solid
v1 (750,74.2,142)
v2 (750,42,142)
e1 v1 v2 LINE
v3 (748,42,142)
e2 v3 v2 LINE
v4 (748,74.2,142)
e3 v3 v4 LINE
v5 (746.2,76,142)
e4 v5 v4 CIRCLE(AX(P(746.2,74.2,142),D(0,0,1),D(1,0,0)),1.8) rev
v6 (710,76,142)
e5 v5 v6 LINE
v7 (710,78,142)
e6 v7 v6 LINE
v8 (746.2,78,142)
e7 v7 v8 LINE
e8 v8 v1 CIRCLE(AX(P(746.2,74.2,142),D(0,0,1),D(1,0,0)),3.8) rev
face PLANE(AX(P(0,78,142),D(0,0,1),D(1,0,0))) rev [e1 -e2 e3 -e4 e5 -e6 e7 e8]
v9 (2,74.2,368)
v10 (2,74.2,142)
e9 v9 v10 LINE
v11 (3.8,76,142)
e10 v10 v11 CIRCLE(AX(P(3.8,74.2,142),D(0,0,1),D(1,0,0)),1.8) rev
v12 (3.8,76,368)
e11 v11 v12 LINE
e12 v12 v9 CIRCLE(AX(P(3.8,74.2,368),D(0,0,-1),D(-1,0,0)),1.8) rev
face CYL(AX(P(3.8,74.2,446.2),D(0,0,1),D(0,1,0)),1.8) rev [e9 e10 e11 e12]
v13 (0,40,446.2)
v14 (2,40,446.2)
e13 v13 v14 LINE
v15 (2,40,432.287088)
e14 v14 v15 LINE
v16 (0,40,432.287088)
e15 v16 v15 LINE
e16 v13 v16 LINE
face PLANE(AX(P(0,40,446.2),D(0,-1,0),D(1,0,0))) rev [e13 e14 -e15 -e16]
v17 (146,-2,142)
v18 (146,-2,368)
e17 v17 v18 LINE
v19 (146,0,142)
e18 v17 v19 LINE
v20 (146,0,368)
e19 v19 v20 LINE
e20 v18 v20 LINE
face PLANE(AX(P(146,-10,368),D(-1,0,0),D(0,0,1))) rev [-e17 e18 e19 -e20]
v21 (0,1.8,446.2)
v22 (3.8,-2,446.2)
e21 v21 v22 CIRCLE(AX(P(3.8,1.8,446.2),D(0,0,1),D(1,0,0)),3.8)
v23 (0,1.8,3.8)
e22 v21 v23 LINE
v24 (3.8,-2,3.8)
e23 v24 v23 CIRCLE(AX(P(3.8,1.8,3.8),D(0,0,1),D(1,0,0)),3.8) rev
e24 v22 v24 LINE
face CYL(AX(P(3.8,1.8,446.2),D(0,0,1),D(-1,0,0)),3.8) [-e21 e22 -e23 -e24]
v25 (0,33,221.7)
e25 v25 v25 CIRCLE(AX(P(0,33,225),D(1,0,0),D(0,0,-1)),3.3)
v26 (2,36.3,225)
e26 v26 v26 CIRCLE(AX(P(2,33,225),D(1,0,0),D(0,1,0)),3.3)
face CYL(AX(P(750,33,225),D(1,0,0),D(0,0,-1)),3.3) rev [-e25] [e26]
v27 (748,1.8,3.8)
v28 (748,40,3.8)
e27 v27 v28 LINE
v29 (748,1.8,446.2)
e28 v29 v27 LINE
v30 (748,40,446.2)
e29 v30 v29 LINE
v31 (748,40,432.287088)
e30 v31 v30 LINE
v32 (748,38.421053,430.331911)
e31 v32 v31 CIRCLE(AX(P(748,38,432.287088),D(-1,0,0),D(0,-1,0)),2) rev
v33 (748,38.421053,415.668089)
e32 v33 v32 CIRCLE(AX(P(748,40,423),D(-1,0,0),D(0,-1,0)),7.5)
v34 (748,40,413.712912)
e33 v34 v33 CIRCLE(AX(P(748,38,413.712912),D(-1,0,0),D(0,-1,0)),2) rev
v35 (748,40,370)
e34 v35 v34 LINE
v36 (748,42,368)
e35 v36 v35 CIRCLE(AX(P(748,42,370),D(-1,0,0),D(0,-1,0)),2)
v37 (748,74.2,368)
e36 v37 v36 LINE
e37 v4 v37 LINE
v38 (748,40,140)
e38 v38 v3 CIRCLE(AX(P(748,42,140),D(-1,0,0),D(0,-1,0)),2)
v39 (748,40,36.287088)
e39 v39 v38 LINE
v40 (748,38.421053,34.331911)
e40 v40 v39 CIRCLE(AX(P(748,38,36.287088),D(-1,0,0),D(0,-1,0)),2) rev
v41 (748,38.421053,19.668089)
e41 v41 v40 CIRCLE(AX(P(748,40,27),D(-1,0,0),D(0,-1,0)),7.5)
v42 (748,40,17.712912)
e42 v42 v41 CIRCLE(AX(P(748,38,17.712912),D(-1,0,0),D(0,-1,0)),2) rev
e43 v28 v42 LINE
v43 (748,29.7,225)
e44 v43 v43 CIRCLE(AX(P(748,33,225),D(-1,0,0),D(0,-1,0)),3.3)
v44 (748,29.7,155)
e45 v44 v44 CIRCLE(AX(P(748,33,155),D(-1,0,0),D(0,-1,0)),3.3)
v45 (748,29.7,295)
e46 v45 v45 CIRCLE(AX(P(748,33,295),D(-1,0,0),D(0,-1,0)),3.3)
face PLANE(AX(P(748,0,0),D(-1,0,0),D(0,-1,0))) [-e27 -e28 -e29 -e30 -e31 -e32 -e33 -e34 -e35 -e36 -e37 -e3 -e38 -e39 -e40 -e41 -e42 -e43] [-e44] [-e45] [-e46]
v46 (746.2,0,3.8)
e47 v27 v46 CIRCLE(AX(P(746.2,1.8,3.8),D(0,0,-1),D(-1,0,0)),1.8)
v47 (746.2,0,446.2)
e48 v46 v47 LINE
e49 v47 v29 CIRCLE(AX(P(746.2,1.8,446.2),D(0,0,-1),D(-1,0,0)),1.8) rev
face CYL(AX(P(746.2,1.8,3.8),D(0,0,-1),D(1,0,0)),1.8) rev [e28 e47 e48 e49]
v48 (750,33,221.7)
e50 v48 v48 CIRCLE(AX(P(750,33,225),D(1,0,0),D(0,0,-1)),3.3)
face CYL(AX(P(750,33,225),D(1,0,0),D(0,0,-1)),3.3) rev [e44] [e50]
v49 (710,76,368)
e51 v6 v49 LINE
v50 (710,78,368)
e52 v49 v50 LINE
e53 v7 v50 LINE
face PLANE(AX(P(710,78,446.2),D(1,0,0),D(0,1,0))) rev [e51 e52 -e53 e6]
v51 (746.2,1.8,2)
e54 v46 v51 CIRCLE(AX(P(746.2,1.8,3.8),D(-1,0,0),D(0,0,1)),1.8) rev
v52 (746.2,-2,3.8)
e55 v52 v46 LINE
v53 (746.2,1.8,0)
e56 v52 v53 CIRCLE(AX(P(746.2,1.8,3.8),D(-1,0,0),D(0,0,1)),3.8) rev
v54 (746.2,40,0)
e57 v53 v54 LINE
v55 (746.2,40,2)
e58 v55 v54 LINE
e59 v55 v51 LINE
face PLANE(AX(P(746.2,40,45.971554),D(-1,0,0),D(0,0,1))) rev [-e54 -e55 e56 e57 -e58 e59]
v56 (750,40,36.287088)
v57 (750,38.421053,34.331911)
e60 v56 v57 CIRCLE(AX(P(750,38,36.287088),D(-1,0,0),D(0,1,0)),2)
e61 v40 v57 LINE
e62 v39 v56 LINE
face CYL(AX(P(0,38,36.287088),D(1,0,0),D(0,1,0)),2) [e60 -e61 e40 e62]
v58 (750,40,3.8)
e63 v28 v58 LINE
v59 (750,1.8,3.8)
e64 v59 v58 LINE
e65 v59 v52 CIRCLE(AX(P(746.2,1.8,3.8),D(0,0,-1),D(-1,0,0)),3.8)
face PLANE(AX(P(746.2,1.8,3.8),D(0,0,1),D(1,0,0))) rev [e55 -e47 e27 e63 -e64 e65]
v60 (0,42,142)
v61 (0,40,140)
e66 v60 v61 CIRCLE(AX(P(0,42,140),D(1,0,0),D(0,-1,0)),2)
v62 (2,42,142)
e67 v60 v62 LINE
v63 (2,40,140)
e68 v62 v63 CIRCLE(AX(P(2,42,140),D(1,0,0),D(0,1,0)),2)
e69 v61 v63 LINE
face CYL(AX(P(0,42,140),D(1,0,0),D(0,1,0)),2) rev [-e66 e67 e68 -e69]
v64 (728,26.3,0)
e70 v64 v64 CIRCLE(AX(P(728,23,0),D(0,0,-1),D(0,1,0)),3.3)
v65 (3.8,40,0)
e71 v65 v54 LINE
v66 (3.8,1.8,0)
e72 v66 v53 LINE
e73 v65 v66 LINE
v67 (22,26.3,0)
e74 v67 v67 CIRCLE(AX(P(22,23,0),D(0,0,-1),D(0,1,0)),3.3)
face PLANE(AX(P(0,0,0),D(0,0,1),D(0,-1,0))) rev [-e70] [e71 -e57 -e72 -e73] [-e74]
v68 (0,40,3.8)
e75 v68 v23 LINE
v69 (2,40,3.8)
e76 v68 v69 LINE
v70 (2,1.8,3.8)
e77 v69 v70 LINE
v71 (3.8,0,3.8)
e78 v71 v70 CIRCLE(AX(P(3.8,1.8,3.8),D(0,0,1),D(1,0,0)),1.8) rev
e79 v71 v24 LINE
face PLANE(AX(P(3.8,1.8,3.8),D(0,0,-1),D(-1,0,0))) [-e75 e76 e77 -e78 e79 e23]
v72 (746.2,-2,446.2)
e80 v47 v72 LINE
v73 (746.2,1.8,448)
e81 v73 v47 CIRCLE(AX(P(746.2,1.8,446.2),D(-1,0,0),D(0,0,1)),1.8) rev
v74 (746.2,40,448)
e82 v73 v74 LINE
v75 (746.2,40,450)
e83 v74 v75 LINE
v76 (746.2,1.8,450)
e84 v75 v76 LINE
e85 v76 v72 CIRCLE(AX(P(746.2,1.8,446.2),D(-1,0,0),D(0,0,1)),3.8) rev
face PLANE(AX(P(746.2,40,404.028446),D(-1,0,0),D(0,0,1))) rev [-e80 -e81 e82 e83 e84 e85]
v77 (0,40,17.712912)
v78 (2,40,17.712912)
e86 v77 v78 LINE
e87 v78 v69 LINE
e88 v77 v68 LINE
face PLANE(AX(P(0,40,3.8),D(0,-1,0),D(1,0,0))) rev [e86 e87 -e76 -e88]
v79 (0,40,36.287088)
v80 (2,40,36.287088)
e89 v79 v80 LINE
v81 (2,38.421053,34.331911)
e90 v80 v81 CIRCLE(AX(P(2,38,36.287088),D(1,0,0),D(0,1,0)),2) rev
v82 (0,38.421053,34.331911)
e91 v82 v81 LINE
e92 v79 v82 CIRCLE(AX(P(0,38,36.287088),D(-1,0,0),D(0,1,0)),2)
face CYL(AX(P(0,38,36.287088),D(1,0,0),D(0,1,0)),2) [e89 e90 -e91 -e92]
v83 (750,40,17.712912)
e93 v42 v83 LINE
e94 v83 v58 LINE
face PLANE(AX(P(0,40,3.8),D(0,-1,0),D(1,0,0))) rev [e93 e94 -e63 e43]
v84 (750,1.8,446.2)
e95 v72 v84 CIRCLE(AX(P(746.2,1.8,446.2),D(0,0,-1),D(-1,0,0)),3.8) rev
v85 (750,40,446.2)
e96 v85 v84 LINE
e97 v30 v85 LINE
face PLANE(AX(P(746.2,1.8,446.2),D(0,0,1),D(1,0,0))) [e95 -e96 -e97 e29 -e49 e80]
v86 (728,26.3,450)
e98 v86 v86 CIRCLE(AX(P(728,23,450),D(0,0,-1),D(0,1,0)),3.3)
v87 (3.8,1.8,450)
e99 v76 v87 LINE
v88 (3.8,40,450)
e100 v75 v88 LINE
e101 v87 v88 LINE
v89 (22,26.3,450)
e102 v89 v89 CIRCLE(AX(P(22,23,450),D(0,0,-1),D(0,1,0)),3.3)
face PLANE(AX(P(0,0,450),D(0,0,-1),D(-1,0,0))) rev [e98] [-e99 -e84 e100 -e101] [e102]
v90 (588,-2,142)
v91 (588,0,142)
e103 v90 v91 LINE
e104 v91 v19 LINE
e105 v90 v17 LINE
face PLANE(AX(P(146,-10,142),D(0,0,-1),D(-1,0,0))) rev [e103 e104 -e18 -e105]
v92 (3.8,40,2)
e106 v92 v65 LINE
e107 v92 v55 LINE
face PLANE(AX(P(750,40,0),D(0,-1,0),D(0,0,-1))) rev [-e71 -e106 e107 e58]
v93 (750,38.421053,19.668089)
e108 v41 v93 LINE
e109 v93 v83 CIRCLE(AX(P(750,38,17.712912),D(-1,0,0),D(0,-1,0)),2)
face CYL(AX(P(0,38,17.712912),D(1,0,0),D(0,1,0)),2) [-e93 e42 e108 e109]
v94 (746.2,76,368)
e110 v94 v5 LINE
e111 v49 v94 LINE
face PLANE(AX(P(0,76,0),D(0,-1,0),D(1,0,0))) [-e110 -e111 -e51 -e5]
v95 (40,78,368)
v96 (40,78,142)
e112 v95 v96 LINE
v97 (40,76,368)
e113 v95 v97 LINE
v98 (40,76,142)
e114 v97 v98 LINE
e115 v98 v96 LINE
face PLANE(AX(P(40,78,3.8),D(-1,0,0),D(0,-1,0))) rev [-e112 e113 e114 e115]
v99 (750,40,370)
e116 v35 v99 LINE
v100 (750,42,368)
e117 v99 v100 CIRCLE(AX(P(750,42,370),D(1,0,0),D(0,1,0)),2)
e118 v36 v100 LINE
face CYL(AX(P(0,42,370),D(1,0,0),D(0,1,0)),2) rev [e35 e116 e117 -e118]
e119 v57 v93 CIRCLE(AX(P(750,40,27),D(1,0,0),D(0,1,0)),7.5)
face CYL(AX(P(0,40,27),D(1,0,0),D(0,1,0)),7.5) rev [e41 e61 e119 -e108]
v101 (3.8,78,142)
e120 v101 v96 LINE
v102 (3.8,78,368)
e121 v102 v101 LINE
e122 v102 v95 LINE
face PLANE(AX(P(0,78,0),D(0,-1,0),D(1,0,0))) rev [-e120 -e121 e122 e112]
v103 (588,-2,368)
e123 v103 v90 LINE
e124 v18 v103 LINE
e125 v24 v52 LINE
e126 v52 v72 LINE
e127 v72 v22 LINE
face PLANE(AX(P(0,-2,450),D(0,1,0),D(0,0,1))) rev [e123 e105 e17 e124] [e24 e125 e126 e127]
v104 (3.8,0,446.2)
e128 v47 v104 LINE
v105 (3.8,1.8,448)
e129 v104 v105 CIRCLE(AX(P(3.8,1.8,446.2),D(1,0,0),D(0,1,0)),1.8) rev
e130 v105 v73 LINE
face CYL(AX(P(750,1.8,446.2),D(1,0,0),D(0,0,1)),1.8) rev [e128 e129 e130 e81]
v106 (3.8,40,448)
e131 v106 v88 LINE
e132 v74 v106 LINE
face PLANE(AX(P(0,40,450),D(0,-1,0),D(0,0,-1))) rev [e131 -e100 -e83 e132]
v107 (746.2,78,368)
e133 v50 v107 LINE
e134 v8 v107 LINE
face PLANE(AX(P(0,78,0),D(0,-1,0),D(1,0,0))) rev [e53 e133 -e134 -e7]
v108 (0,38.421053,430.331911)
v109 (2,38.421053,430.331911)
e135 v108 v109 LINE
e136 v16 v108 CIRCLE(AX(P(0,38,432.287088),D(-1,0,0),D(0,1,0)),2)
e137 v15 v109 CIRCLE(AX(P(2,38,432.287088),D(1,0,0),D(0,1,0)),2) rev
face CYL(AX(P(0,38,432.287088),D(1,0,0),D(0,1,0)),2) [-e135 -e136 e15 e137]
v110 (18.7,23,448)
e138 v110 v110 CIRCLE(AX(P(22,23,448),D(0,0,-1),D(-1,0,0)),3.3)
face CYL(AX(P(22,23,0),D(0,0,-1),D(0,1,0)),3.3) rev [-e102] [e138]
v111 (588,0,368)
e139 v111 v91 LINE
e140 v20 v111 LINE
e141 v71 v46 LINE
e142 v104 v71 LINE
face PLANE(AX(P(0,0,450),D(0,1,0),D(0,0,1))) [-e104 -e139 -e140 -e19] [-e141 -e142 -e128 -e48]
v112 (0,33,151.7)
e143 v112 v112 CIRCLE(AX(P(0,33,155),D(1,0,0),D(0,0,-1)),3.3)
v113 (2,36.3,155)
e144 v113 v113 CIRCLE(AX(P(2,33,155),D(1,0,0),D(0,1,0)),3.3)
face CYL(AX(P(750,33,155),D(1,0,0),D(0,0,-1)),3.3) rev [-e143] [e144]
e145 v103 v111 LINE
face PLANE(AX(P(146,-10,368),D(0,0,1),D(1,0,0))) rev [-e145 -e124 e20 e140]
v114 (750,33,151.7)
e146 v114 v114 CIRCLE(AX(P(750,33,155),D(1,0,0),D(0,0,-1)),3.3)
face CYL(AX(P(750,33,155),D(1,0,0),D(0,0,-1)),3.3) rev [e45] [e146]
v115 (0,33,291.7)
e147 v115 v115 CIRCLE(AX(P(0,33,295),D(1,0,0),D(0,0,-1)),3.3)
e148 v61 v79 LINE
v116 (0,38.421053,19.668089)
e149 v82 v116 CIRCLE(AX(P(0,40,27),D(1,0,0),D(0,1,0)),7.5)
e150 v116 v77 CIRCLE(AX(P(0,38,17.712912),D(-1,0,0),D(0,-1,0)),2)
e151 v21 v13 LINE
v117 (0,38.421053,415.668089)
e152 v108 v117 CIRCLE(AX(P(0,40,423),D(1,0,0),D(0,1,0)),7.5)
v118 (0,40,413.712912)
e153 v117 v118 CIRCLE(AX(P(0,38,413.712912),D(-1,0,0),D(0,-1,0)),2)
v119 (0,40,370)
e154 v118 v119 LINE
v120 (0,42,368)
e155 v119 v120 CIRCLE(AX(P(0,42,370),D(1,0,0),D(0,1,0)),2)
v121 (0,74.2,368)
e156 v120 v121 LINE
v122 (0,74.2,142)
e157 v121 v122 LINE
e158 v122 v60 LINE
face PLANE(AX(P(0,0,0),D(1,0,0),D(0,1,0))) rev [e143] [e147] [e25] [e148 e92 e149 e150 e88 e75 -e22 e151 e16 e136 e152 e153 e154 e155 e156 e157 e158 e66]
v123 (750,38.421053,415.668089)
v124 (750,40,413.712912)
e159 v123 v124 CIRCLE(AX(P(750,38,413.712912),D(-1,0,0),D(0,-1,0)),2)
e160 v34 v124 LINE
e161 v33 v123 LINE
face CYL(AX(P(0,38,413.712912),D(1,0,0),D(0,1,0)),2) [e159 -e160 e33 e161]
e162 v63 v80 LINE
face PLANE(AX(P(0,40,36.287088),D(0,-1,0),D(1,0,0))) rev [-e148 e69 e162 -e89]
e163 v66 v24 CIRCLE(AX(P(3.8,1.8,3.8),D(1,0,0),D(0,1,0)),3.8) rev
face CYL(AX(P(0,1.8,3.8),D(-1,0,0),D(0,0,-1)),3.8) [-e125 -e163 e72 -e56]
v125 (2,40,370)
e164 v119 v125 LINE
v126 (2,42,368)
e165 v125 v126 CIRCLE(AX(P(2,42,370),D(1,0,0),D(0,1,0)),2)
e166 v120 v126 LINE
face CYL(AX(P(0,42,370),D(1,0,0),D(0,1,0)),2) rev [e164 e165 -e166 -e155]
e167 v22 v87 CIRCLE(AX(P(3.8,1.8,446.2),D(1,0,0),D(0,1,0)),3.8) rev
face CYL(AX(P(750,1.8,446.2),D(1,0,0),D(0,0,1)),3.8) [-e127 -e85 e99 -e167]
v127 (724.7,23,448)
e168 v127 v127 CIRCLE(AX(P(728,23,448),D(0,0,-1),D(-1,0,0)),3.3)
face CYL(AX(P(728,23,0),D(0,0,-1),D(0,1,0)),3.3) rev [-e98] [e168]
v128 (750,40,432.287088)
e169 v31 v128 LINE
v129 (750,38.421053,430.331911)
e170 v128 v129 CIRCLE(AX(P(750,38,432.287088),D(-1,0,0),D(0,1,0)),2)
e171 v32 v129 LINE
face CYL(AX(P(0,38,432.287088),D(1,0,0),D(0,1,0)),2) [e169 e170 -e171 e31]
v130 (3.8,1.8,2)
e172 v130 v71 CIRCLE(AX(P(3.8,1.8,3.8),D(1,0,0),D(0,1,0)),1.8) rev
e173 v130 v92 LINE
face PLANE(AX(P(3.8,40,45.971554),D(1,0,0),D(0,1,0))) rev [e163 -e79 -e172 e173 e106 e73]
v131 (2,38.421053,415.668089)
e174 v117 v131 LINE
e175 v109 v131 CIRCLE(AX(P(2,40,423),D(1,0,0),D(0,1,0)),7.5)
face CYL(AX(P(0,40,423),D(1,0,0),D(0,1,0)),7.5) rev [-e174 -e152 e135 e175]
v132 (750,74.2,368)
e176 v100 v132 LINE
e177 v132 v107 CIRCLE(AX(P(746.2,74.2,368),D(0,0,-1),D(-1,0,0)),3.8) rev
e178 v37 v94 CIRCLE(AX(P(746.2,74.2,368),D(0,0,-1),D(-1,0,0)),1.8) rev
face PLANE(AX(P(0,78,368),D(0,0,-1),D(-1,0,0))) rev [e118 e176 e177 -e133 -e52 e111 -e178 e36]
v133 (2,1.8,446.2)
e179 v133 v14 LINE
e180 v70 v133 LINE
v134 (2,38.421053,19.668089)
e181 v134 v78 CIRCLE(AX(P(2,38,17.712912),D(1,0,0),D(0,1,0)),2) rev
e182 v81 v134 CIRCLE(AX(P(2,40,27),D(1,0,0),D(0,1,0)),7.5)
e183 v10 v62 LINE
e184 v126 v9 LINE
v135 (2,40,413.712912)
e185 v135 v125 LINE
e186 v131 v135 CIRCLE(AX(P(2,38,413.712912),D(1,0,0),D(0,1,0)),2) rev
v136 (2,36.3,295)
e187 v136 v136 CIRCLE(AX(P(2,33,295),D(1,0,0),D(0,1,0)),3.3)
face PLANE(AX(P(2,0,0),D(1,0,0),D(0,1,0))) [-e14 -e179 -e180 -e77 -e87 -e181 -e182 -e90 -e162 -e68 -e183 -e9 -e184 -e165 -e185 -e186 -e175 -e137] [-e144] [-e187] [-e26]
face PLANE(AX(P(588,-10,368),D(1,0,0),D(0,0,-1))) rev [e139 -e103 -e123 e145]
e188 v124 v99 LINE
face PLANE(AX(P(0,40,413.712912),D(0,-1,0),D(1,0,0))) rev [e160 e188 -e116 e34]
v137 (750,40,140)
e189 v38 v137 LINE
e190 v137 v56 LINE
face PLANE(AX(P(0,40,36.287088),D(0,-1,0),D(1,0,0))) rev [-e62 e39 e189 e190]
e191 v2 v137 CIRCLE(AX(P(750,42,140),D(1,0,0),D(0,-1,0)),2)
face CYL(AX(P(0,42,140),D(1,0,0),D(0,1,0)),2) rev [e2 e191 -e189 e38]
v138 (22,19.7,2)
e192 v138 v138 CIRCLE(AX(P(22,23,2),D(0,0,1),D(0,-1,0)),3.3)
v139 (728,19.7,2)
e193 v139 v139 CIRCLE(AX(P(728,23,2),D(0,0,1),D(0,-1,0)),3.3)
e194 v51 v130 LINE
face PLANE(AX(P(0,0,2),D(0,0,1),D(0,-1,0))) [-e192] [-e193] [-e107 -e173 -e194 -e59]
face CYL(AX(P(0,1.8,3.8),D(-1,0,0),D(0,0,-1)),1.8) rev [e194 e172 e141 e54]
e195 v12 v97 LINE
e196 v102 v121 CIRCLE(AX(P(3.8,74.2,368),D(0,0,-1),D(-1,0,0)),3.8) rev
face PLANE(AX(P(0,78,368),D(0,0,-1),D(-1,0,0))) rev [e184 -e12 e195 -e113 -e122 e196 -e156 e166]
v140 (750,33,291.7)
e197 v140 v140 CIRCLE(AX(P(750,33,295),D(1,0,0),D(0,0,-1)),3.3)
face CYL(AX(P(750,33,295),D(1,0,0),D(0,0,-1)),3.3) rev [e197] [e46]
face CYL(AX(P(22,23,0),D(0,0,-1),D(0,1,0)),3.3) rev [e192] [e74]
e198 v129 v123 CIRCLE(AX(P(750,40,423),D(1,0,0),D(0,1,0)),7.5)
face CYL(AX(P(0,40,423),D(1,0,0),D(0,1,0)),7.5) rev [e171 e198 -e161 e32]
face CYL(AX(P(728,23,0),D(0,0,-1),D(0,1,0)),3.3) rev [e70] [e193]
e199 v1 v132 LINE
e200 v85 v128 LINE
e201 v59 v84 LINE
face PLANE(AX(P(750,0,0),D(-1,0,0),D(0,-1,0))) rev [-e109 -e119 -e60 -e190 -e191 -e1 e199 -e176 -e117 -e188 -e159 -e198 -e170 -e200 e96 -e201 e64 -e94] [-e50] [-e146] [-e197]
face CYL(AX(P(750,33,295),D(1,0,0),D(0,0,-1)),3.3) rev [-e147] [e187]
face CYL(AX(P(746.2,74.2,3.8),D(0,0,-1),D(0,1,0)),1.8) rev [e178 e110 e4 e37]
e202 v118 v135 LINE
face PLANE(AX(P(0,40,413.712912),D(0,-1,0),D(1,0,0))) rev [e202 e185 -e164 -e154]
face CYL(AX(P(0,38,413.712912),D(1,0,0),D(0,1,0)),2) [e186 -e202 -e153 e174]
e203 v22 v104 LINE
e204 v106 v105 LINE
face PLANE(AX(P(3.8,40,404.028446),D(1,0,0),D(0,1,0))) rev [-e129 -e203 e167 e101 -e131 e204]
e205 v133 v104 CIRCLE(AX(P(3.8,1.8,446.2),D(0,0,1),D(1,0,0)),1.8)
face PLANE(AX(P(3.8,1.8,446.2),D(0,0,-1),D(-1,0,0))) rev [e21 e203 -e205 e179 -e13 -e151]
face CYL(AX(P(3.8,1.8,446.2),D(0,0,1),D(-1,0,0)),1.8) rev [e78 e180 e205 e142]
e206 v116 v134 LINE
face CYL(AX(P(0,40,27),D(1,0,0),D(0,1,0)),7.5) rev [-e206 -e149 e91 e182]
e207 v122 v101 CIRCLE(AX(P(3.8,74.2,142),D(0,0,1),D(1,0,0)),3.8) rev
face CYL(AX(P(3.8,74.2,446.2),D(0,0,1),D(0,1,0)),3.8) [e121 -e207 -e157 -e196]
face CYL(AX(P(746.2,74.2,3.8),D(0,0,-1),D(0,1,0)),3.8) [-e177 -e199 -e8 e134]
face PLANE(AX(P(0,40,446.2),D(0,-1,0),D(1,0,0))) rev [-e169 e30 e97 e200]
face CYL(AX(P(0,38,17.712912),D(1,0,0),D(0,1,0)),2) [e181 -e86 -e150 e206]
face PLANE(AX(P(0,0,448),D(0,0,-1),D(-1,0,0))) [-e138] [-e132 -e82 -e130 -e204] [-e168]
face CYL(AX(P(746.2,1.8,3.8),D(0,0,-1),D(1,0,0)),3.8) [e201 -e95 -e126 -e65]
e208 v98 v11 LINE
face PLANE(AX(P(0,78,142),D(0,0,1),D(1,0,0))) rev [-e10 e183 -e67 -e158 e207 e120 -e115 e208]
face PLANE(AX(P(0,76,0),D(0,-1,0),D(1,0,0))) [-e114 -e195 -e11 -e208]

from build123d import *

# Parameters (mm, degrees)
SKETCH_1_W                         = 750
SKETCH_1_H                         = 2
SM_BASE_FLANGE_1_DEPTH             = 450
SM_EDGE_FLANGE_1_STRIP_W           = 11.6
SM_EDGE_FLANGE_1_STRIP_H           = 2
SM_EDGE_FLANGE_1_STRIP_CUT_DEPTH   = 750
SM_EDGE_FLANGE_1_STRIP_2_W         = 11.6
SM_EDGE_FLANGE_1_STRIP_2_H         = 2
SM_EDGE_FLANGE_1_STRIP_CUT_2_DEPTH = 750
SM_EDGE_FLANGE_1_DEPTH             = 750
SM_EDGE_FLANGE_1_BEND_DEPTH        = 750
SM_EDGE_FLANGE_2_STRIP_W           = 11.6
SM_EDGE_FLANGE_2_STRIP_H           = 2
SM_EDGE_FLANGE_2_STRIP_CUT_DEPTH   = 442.4
SM_EDGE_FLANGE_2_STRIP_2_W         = 11.6
SM_EDGE_FLANGE_2_STRIP_2_H         = 2
SM_EDGE_FLANGE_2_STRIP_CUT_2_DEPTH = 442.4
SM_EDGE_FLANGE_2_DEPTH             = 442.4
SM_EDGE_FLANGE_2_BEND_DEPTH        = 442.4
CUT_EXTRUDE_1_REACH                = 880.114
SKETCH_19_W                        = 3.8
SKETCH_19_H                        = 42
SKETCH_20_W                        = 3.8
SKETCH_20_H                        = 42
CUT_EXTRUDE_2_DEPTH                = 3.8
SKETCH_21_W                        = 442
SKETCH_21_H                        = 226
CUT_EXTRUDE_3_DEPTH                = 10
SM_EDGE_FLANGE_3_STRIP_W           = 11.6
SM_EDGE_FLANGE_3_STRIP_H           = 2
SM_EDGE_FLANGE_3_STRIP_CUT_DEPTH   = 442.4
SM_EDGE_FLANGE_3_STRIP_2_W         = 11.6
SM_EDGE_FLANGE_3_STRIP_2_H         = 2
SM_EDGE_FLANGE_3_STRIP_CUT_2_DEPTH = 442.4
SM_EDGE_FLANGE_3_DEPTH             = 442.4
SM_EDGE_FLANGE_3_BEND_DEPTH        = 442.4
CUT_EXTRUDE_4_DEPTH                = 879.11388783
HOLE_WIZARD_M61_D                  = 6.6
HOLE_WIZARD_M62_D                  = 6.6


# Sheet-metal steps are written as plain solids
with BuildPart() as part:
    # Sketch 1 → Базовая кромка1 (new body)
    with BuildSketch(Plane.XY):
        with Locations((375, -1)):
            Rectangle(SKETCH_1_W, SKETCH_1_H)
    extrude(amount=SM_BASE_FLANGE_1_DEPTH)

    # Ребро-кромка1 strip (across the edge) → Ребро-кромка1 strip cut (cut)
    with BuildSketch(Plane(origin=(0, 0, 450), x_dir=(0, 0, -1), z_dir=(1, 0, 0))):
        with Locations((-2, -1)):
            Rectangle(SM_EDGE_FLANGE_1_STRIP_W, SM_EDGE_FLANGE_1_STRIP_H)
    extrude(amount=SM_EDGE_FLANGE_1_STRIP_CUT_DEPTH, mode=Mode.SUBTRACT)

    # Ребро-кромка1 strip 2 (across the edge) → Ребро-кромка1 strip cut 2 (cut)
    with BuildSketch(Plane.ZY.offset(-750)):
        with Locations((-2, -1)):
            Rectangle(SM_EDGE_FLANGE_1_STRIP_2_W, SM_EDGE_FLANGE_1_STRIP_2_H)
    extrude(amount=SM_EDGE_FLANGE_1_STRIP_CUT_2_DEPTH, mode=Mode.SUBTRACT)

    # Ребро-кромка1 section (across the edge) → Ребро-кромка1 (add)
    with BuildSketch(Plane(origin=(0, 0, 450), x_dir=(0, 0, -1), z_dir=(1, 0, 0))):
        with BuildLine():
            Line((0, 1.8), (0, 40))
            Line((0, 40), (2, 40))
            Line((2, 40), (2, 1.8))
            ThreePointArc((2, 1.8), (2.527207794, 0.527207794), (3.8, 0))
            Line((3.8, 0), (3.8, -2))
            ThreePointArc((3.8, -2), (1.112994231, -0.887005769), (0, 1.8))
        make_face()
    extrude(amount=SM_EDGE_FLANGE_1_DEPTH)

    # Ребро-кромка1 section 2 (across the edge) → Ребро-кромка1 bend (add)
    with BuildSketch(Plane.ZY.offset(-750)):
        with BuildLine():
            Line((0, 1.8), (0, 40))
            Line((0, 40), (2, 40))
            Line((2, 40), (2, 1.8))
            ThreePointArc((2, 1.8), (2.527207794, 0.527207794), (3.8, 0))
            Line((3.8, 0), (3.8, -2))
            ThreePointArc((3.8, -2), (1.112994231, -0.887005769), (0, 1.8))
        make_face()
    extrude(amount=SM_EDGE_FLANGE_1_BEND_DEPTH)

    # Ребро-кромка2 strip (across the edge) → Ребро-кромка2 strip cut (cut)
    with BuildSketch(Plane.XY.offset(3.8)):
        with Locations((-2, -1)):
            Rectangle(SM_EDGE_FLANGE_2_STRIP_W, SM_EDGE_FLANGE_2_STRIP_H)
    extrude(amount=SM_EDGE_FLANGE_2_STRIP_CUT_DEPTH, mode=Mode.SUBTRACT)

    # Ребро-кромка2 strip 2 (across the edge) → Ребро-кромка2 strip cut 2 (cut)
    with BuildSketch(Plane(origin=(750, 0, 446.2), x_dir=(-1, 0, 0), z_dir=(0, 0, -1))):
        with Locations((-2, -1)):
            Rectangle(SM_EDGE_FLANGE_2_STRIP_2_W, SM_EDGE_FLANGE_2_STRIP_2_H)
    extrude(amount=SM_EDGE_FLANGE_2_STRIP_CUT_2_DEPTH, mode=Mode.SUBTRACT)

    # Ребро-кромка2 section (across the edge) → Ребро-кромка2 (add)
    with BuildSketch(Plane.XY.offset(3.8)):
        with BuildLine():
            Line((0, 1.8), (0, 78))
            Line((0, 78), (2, 78))
            Line((2, 78), (2, 1.8))
            ThreePointArc((2, 1.8), (2.527207794, 0.527207794), (3.8, 0))
            Line((3.8, 0), (3.8, -2))
            ThreePointArc((3.8, -2), (1.112994231, -0.887005769), (0, 1.8))
        make_face()
    extrude(amount=SM_EDGE_FLANGE_2_DEPTH)

    # Ребро-кромка2 section 2 (across the edge) → Ребро-кромка2 bend (add)
    with BuildSketch(Plane(origin=(750, 0, 446.2), x_dir=(-1, 0, 0), z_dir=(0, 0, -1))):
        with BuildLine():
            Line((0, 1.8), (0, 78))
            Line((0, 78), (2, 78))
            Line((2, 78), (2, 1.8))
            ThreePointArc((2, 1.8), (2.527207794, 0.527207794), (3.8, 0))
            Line((3.8, 0), (3.8, -2))
            ThreePointArc((3.8, -2), (1.112994231, -0.887005769), (0, 1.8))
        make_face()
    extrude(amount=SM_EDGE_FLANGE_2_BEND_DEPTH)

    # Вырез-Вытянуть1: up to this face of the body (flat: up to its plane)
    cut_extrude_1_end = Plane(part.part.faces().sort_by_distance((748.992300856, 38.893795601, 446.2))[0])
    # Эскиз19 → Вырез-Вытянуть1 (cut, up to the picked face)
    with BuildSketch(Plane.XY.offset(450), mode=Mode.PRIVATE) as cut_extrude_1_sk1:
        with Locations((1.9, 19)):
            Rectangle(SKETCH_19_W, SKETCH_19_H)
    cut_extrude_1_tool1 = split(extrude(cut_extrude_1_sk1.sketch, amount=-CUT_EXTRUDE_1_REACH, mode=Mode.PRIVATE), bisect_by=cut_extrude_1_end, keep=Keep.BOTH, mode=Mode.PRIVATE)
    # Эскиз19 → Вырез-Вытянуть1 (cut, up to the picked face)
    with BuildSketch(Plane.XY.offset(450), mode=Mode.PRIVATE) as cut_extrude_1_sk2:
        with Locations((748.1, 19)):
            Rectangle(SKETCH_19_W, SKETCH_19_H)
    cut_extrude_1_tool2 = split(extrude(cut_extrude_1_sk2.sketch, amount=-CUT_EXTRUDE_1_REACH, mode=Mode.PRIVATE), bisect_by=cut_extrude_1_end, keep=Keep.BOTH, mode=Mode.PRIVATE)
    add(cut_extrude_1_tool1.solids().sort_by(Axis((1.9, 19, 450), (0, 0, -1)))[0], mode=Mode.SUBTRACT)
    add(cut_extrude_1_tool2.solids().sort_by(Axis((748.1, 19, 450), (0, 0, -1)))[0], mode=Mode.SUBTRACT)

    # Эскиз20 → Вырез-Вытянуть2 (cut)
    with BuildSketch(Plane(origin=(0, 0, 0), x_dir=(-1, 0, 0), z_dir=(0, 0, -1))):
        with Locations((-748.1, 19)):
            Rectangle(SKETCH_20_W, SKETCH_20_H)
        with Locations((-1.9, 19)):
            Rectangle(SKETCH_20_W, SKETCH_20_H)
    extrude(amount=-CUT_EXTRUDE_2_DEPTH, mode=Mode.SUBTRACT)

    # Эскиз21 → Вырез-Вытянуть3 (cut)
    with BuildSketch(Plane(origin=(0, 0, 0), x_dir=(1, 0, 0), z_dir=(0, 1, 0))):
        with Locations((367, -255)):
            Rectangle(SKETCH_21_W, SKETCH_21_H)
    extrude(amount=-CUT_EXTRUDE_3_DEPTH, mode=Mode.SUBTRACT)

    # Ребро-кромка3 strip (across the edge) → Ребро-кромка3 strip cut (cut)
    with BuildSketch(Plane(origin=(748, 78, 446.2), x_dir=(0, -1, 0), z_dir=(0, 0, -1))):
        with Locations((-2, -1)):
            Rectangle(SM_EDGE_FLANGE_3_STRIP_W, SM_EDGE_FLANGE_3_STRIP_H)
    extrude(amount=SM_EDGE_FLANGE_3_STRIP_CUT_DEPTH, mode=Mode.SUBTRACT)

    # Ребро-кромка3 strip 2 (across the edge) → Ребро-кромка3 strip cut 2 (cut)
    with BuildSketch(Plane(origin=(2, 78, 3.8), x_dir=(0, -1, 0), z_dir=(0, 0, 1))):
        with Locations((-2, -1)):
            Rectangle(SM_EDGE_FLANGE_3_STRIP_2_W, SM_EDGE_FLANGE_3_STRIP_2_H)
    extrude(amount=SM_EDGE_FLANGE_3_STRIP_CUT_2_DEPTH, mode=Mode.SUBTRACT)

    # Ребро-кромка3 section (across the edge) → Ребро-кромка3 (add)
    with BuildSketch(Plane(origin=(748, 78, 446.2), x_dir=(0, -1, 0), z_dir=(0, 0, -1))):
        with BuildLine():
            Line((0, 1.8), (0, 38))
            Line((0, 38), (2, 38))
            Line((2, 38), (2, 1.8))
            ThreePointArc((2, 1.8), (2.527207794, 0.527207794), (3.8, 0))
            Line((3.8, 0), (3.8, -2))
            ThreePointArc((3.8, -2), (1.112994231, -0.887005769), (0, 1.8))
        make_face()
    extrude(amount=SM_EDGE_FLANGE_3_DEPTH)

    # Ребро-кромка3 section 2 (across the edge) → Ребро-кромка3 bend (add)
    with BuildSketch(Plane(origin=(2, 78, 3.8), x_dir=(0, -1, 0), z_dir=(0, 0, 1))):
        with BuildLine():
            Line((0, 1.8), (0, 38))
            Line((0, 38), (2, 38))
            Line((2, 38), (2, 1.8))
            ThreePointArc((2, 1.8), (2.527207794, 0.527207794), (3.8, 0))
            Line((3.8, 0), (3.8, -2))
            ThreePointArc((3.8, -2), (1.112994231, -0.887005769), (0, 1.8))
        make_face()
    extrude(amount=SM_EDGE_FLANGE_3_BEND_DEPTH)

    # Эскиз28 → Вырез-Вытянуть4 (cut, through all)
    with BuildSketch(Plane(origin=(750, 0, 0), x_dir=(0, 0, -1), z_dir=(1, 0, 0))):
        with BuildLine():
            Line((-446.2, 78), (-368, 78))
            Line((-368, 78), (-368, 42))
            ThreePointArc((-368, 42), (-368.585786438, 40.585786438), (-370, 40))
            Line((-370, 40), (-413.712912189, 40))
            ThreePointArc((-413.712912189, 40), (-414.969473914, 39.55597321), (-415.668088571, 38.421052632))
            ThreePointArc((-415.668088571, 38.421052632), (-423, 32.5), (-430.331911429, 38.421052632))
            ThreePointArc((-430.331911429, 38.421052632), (-431.030526086, 39.55597321), (-432.287087811, 40))
            Line((-432.287087811, 40), (-446.2, 40))
            Line((-446.2, 40), (-446.2, 78))
        make_face()
        with BuildLine():
            Line((-3.8, 78), (-142, 78))
            Line((-142, 78), (-142, 42))
            ThreePointArc((-142, 42), (-141.414213562, 40.585786438), (-140, 40))
            Line((-140, 40), (-36.287087811, 40))
            ThreePointArc((-36.287087811, 40), (-35.030526086, 39.55597321), (-34.331911429, 38.421052632))
            ThreePointArc((-34.331911429, 38.421052632), (-27, 32.5), (-19.668088571, 38.421052632))
            ThreePointArc((-19.668088571, 38.421052632), (-18.969473914, 39.55597321), (-17.712912189, 40))
            Line((-17.712912189, 40), (-3.8, 40))
            Line((-3.8, 40), (-3.8, 78))
        make_face()
    extrude(amount=-CUT_EXTRUDE_4_DEPTH, mode=Mode.SUBTRACT)

    # Отверстие с зазором M61 (through all)
    with Locations(Plane(origin=(0, 0, 0), x_dir=(-1, 0, 0), z_dir=(0, 0, -1))):
        with Locations((-728, 23), (-22, 23)):
            Hole(HOLE_WIZARD_M61_D / 2)

    # Отверстие с зазором M62 (through all)
    with Locations(Plane(origin=(750, 0, 0), x_dir=(0, 0, -1), z_dir=(1, 0, 0))):
        with Locations((-295, 33), (-225, 33), (-155, 33)):
            Hole(HOLE_WIZARD_M62_D / 2)


solid = part.part
